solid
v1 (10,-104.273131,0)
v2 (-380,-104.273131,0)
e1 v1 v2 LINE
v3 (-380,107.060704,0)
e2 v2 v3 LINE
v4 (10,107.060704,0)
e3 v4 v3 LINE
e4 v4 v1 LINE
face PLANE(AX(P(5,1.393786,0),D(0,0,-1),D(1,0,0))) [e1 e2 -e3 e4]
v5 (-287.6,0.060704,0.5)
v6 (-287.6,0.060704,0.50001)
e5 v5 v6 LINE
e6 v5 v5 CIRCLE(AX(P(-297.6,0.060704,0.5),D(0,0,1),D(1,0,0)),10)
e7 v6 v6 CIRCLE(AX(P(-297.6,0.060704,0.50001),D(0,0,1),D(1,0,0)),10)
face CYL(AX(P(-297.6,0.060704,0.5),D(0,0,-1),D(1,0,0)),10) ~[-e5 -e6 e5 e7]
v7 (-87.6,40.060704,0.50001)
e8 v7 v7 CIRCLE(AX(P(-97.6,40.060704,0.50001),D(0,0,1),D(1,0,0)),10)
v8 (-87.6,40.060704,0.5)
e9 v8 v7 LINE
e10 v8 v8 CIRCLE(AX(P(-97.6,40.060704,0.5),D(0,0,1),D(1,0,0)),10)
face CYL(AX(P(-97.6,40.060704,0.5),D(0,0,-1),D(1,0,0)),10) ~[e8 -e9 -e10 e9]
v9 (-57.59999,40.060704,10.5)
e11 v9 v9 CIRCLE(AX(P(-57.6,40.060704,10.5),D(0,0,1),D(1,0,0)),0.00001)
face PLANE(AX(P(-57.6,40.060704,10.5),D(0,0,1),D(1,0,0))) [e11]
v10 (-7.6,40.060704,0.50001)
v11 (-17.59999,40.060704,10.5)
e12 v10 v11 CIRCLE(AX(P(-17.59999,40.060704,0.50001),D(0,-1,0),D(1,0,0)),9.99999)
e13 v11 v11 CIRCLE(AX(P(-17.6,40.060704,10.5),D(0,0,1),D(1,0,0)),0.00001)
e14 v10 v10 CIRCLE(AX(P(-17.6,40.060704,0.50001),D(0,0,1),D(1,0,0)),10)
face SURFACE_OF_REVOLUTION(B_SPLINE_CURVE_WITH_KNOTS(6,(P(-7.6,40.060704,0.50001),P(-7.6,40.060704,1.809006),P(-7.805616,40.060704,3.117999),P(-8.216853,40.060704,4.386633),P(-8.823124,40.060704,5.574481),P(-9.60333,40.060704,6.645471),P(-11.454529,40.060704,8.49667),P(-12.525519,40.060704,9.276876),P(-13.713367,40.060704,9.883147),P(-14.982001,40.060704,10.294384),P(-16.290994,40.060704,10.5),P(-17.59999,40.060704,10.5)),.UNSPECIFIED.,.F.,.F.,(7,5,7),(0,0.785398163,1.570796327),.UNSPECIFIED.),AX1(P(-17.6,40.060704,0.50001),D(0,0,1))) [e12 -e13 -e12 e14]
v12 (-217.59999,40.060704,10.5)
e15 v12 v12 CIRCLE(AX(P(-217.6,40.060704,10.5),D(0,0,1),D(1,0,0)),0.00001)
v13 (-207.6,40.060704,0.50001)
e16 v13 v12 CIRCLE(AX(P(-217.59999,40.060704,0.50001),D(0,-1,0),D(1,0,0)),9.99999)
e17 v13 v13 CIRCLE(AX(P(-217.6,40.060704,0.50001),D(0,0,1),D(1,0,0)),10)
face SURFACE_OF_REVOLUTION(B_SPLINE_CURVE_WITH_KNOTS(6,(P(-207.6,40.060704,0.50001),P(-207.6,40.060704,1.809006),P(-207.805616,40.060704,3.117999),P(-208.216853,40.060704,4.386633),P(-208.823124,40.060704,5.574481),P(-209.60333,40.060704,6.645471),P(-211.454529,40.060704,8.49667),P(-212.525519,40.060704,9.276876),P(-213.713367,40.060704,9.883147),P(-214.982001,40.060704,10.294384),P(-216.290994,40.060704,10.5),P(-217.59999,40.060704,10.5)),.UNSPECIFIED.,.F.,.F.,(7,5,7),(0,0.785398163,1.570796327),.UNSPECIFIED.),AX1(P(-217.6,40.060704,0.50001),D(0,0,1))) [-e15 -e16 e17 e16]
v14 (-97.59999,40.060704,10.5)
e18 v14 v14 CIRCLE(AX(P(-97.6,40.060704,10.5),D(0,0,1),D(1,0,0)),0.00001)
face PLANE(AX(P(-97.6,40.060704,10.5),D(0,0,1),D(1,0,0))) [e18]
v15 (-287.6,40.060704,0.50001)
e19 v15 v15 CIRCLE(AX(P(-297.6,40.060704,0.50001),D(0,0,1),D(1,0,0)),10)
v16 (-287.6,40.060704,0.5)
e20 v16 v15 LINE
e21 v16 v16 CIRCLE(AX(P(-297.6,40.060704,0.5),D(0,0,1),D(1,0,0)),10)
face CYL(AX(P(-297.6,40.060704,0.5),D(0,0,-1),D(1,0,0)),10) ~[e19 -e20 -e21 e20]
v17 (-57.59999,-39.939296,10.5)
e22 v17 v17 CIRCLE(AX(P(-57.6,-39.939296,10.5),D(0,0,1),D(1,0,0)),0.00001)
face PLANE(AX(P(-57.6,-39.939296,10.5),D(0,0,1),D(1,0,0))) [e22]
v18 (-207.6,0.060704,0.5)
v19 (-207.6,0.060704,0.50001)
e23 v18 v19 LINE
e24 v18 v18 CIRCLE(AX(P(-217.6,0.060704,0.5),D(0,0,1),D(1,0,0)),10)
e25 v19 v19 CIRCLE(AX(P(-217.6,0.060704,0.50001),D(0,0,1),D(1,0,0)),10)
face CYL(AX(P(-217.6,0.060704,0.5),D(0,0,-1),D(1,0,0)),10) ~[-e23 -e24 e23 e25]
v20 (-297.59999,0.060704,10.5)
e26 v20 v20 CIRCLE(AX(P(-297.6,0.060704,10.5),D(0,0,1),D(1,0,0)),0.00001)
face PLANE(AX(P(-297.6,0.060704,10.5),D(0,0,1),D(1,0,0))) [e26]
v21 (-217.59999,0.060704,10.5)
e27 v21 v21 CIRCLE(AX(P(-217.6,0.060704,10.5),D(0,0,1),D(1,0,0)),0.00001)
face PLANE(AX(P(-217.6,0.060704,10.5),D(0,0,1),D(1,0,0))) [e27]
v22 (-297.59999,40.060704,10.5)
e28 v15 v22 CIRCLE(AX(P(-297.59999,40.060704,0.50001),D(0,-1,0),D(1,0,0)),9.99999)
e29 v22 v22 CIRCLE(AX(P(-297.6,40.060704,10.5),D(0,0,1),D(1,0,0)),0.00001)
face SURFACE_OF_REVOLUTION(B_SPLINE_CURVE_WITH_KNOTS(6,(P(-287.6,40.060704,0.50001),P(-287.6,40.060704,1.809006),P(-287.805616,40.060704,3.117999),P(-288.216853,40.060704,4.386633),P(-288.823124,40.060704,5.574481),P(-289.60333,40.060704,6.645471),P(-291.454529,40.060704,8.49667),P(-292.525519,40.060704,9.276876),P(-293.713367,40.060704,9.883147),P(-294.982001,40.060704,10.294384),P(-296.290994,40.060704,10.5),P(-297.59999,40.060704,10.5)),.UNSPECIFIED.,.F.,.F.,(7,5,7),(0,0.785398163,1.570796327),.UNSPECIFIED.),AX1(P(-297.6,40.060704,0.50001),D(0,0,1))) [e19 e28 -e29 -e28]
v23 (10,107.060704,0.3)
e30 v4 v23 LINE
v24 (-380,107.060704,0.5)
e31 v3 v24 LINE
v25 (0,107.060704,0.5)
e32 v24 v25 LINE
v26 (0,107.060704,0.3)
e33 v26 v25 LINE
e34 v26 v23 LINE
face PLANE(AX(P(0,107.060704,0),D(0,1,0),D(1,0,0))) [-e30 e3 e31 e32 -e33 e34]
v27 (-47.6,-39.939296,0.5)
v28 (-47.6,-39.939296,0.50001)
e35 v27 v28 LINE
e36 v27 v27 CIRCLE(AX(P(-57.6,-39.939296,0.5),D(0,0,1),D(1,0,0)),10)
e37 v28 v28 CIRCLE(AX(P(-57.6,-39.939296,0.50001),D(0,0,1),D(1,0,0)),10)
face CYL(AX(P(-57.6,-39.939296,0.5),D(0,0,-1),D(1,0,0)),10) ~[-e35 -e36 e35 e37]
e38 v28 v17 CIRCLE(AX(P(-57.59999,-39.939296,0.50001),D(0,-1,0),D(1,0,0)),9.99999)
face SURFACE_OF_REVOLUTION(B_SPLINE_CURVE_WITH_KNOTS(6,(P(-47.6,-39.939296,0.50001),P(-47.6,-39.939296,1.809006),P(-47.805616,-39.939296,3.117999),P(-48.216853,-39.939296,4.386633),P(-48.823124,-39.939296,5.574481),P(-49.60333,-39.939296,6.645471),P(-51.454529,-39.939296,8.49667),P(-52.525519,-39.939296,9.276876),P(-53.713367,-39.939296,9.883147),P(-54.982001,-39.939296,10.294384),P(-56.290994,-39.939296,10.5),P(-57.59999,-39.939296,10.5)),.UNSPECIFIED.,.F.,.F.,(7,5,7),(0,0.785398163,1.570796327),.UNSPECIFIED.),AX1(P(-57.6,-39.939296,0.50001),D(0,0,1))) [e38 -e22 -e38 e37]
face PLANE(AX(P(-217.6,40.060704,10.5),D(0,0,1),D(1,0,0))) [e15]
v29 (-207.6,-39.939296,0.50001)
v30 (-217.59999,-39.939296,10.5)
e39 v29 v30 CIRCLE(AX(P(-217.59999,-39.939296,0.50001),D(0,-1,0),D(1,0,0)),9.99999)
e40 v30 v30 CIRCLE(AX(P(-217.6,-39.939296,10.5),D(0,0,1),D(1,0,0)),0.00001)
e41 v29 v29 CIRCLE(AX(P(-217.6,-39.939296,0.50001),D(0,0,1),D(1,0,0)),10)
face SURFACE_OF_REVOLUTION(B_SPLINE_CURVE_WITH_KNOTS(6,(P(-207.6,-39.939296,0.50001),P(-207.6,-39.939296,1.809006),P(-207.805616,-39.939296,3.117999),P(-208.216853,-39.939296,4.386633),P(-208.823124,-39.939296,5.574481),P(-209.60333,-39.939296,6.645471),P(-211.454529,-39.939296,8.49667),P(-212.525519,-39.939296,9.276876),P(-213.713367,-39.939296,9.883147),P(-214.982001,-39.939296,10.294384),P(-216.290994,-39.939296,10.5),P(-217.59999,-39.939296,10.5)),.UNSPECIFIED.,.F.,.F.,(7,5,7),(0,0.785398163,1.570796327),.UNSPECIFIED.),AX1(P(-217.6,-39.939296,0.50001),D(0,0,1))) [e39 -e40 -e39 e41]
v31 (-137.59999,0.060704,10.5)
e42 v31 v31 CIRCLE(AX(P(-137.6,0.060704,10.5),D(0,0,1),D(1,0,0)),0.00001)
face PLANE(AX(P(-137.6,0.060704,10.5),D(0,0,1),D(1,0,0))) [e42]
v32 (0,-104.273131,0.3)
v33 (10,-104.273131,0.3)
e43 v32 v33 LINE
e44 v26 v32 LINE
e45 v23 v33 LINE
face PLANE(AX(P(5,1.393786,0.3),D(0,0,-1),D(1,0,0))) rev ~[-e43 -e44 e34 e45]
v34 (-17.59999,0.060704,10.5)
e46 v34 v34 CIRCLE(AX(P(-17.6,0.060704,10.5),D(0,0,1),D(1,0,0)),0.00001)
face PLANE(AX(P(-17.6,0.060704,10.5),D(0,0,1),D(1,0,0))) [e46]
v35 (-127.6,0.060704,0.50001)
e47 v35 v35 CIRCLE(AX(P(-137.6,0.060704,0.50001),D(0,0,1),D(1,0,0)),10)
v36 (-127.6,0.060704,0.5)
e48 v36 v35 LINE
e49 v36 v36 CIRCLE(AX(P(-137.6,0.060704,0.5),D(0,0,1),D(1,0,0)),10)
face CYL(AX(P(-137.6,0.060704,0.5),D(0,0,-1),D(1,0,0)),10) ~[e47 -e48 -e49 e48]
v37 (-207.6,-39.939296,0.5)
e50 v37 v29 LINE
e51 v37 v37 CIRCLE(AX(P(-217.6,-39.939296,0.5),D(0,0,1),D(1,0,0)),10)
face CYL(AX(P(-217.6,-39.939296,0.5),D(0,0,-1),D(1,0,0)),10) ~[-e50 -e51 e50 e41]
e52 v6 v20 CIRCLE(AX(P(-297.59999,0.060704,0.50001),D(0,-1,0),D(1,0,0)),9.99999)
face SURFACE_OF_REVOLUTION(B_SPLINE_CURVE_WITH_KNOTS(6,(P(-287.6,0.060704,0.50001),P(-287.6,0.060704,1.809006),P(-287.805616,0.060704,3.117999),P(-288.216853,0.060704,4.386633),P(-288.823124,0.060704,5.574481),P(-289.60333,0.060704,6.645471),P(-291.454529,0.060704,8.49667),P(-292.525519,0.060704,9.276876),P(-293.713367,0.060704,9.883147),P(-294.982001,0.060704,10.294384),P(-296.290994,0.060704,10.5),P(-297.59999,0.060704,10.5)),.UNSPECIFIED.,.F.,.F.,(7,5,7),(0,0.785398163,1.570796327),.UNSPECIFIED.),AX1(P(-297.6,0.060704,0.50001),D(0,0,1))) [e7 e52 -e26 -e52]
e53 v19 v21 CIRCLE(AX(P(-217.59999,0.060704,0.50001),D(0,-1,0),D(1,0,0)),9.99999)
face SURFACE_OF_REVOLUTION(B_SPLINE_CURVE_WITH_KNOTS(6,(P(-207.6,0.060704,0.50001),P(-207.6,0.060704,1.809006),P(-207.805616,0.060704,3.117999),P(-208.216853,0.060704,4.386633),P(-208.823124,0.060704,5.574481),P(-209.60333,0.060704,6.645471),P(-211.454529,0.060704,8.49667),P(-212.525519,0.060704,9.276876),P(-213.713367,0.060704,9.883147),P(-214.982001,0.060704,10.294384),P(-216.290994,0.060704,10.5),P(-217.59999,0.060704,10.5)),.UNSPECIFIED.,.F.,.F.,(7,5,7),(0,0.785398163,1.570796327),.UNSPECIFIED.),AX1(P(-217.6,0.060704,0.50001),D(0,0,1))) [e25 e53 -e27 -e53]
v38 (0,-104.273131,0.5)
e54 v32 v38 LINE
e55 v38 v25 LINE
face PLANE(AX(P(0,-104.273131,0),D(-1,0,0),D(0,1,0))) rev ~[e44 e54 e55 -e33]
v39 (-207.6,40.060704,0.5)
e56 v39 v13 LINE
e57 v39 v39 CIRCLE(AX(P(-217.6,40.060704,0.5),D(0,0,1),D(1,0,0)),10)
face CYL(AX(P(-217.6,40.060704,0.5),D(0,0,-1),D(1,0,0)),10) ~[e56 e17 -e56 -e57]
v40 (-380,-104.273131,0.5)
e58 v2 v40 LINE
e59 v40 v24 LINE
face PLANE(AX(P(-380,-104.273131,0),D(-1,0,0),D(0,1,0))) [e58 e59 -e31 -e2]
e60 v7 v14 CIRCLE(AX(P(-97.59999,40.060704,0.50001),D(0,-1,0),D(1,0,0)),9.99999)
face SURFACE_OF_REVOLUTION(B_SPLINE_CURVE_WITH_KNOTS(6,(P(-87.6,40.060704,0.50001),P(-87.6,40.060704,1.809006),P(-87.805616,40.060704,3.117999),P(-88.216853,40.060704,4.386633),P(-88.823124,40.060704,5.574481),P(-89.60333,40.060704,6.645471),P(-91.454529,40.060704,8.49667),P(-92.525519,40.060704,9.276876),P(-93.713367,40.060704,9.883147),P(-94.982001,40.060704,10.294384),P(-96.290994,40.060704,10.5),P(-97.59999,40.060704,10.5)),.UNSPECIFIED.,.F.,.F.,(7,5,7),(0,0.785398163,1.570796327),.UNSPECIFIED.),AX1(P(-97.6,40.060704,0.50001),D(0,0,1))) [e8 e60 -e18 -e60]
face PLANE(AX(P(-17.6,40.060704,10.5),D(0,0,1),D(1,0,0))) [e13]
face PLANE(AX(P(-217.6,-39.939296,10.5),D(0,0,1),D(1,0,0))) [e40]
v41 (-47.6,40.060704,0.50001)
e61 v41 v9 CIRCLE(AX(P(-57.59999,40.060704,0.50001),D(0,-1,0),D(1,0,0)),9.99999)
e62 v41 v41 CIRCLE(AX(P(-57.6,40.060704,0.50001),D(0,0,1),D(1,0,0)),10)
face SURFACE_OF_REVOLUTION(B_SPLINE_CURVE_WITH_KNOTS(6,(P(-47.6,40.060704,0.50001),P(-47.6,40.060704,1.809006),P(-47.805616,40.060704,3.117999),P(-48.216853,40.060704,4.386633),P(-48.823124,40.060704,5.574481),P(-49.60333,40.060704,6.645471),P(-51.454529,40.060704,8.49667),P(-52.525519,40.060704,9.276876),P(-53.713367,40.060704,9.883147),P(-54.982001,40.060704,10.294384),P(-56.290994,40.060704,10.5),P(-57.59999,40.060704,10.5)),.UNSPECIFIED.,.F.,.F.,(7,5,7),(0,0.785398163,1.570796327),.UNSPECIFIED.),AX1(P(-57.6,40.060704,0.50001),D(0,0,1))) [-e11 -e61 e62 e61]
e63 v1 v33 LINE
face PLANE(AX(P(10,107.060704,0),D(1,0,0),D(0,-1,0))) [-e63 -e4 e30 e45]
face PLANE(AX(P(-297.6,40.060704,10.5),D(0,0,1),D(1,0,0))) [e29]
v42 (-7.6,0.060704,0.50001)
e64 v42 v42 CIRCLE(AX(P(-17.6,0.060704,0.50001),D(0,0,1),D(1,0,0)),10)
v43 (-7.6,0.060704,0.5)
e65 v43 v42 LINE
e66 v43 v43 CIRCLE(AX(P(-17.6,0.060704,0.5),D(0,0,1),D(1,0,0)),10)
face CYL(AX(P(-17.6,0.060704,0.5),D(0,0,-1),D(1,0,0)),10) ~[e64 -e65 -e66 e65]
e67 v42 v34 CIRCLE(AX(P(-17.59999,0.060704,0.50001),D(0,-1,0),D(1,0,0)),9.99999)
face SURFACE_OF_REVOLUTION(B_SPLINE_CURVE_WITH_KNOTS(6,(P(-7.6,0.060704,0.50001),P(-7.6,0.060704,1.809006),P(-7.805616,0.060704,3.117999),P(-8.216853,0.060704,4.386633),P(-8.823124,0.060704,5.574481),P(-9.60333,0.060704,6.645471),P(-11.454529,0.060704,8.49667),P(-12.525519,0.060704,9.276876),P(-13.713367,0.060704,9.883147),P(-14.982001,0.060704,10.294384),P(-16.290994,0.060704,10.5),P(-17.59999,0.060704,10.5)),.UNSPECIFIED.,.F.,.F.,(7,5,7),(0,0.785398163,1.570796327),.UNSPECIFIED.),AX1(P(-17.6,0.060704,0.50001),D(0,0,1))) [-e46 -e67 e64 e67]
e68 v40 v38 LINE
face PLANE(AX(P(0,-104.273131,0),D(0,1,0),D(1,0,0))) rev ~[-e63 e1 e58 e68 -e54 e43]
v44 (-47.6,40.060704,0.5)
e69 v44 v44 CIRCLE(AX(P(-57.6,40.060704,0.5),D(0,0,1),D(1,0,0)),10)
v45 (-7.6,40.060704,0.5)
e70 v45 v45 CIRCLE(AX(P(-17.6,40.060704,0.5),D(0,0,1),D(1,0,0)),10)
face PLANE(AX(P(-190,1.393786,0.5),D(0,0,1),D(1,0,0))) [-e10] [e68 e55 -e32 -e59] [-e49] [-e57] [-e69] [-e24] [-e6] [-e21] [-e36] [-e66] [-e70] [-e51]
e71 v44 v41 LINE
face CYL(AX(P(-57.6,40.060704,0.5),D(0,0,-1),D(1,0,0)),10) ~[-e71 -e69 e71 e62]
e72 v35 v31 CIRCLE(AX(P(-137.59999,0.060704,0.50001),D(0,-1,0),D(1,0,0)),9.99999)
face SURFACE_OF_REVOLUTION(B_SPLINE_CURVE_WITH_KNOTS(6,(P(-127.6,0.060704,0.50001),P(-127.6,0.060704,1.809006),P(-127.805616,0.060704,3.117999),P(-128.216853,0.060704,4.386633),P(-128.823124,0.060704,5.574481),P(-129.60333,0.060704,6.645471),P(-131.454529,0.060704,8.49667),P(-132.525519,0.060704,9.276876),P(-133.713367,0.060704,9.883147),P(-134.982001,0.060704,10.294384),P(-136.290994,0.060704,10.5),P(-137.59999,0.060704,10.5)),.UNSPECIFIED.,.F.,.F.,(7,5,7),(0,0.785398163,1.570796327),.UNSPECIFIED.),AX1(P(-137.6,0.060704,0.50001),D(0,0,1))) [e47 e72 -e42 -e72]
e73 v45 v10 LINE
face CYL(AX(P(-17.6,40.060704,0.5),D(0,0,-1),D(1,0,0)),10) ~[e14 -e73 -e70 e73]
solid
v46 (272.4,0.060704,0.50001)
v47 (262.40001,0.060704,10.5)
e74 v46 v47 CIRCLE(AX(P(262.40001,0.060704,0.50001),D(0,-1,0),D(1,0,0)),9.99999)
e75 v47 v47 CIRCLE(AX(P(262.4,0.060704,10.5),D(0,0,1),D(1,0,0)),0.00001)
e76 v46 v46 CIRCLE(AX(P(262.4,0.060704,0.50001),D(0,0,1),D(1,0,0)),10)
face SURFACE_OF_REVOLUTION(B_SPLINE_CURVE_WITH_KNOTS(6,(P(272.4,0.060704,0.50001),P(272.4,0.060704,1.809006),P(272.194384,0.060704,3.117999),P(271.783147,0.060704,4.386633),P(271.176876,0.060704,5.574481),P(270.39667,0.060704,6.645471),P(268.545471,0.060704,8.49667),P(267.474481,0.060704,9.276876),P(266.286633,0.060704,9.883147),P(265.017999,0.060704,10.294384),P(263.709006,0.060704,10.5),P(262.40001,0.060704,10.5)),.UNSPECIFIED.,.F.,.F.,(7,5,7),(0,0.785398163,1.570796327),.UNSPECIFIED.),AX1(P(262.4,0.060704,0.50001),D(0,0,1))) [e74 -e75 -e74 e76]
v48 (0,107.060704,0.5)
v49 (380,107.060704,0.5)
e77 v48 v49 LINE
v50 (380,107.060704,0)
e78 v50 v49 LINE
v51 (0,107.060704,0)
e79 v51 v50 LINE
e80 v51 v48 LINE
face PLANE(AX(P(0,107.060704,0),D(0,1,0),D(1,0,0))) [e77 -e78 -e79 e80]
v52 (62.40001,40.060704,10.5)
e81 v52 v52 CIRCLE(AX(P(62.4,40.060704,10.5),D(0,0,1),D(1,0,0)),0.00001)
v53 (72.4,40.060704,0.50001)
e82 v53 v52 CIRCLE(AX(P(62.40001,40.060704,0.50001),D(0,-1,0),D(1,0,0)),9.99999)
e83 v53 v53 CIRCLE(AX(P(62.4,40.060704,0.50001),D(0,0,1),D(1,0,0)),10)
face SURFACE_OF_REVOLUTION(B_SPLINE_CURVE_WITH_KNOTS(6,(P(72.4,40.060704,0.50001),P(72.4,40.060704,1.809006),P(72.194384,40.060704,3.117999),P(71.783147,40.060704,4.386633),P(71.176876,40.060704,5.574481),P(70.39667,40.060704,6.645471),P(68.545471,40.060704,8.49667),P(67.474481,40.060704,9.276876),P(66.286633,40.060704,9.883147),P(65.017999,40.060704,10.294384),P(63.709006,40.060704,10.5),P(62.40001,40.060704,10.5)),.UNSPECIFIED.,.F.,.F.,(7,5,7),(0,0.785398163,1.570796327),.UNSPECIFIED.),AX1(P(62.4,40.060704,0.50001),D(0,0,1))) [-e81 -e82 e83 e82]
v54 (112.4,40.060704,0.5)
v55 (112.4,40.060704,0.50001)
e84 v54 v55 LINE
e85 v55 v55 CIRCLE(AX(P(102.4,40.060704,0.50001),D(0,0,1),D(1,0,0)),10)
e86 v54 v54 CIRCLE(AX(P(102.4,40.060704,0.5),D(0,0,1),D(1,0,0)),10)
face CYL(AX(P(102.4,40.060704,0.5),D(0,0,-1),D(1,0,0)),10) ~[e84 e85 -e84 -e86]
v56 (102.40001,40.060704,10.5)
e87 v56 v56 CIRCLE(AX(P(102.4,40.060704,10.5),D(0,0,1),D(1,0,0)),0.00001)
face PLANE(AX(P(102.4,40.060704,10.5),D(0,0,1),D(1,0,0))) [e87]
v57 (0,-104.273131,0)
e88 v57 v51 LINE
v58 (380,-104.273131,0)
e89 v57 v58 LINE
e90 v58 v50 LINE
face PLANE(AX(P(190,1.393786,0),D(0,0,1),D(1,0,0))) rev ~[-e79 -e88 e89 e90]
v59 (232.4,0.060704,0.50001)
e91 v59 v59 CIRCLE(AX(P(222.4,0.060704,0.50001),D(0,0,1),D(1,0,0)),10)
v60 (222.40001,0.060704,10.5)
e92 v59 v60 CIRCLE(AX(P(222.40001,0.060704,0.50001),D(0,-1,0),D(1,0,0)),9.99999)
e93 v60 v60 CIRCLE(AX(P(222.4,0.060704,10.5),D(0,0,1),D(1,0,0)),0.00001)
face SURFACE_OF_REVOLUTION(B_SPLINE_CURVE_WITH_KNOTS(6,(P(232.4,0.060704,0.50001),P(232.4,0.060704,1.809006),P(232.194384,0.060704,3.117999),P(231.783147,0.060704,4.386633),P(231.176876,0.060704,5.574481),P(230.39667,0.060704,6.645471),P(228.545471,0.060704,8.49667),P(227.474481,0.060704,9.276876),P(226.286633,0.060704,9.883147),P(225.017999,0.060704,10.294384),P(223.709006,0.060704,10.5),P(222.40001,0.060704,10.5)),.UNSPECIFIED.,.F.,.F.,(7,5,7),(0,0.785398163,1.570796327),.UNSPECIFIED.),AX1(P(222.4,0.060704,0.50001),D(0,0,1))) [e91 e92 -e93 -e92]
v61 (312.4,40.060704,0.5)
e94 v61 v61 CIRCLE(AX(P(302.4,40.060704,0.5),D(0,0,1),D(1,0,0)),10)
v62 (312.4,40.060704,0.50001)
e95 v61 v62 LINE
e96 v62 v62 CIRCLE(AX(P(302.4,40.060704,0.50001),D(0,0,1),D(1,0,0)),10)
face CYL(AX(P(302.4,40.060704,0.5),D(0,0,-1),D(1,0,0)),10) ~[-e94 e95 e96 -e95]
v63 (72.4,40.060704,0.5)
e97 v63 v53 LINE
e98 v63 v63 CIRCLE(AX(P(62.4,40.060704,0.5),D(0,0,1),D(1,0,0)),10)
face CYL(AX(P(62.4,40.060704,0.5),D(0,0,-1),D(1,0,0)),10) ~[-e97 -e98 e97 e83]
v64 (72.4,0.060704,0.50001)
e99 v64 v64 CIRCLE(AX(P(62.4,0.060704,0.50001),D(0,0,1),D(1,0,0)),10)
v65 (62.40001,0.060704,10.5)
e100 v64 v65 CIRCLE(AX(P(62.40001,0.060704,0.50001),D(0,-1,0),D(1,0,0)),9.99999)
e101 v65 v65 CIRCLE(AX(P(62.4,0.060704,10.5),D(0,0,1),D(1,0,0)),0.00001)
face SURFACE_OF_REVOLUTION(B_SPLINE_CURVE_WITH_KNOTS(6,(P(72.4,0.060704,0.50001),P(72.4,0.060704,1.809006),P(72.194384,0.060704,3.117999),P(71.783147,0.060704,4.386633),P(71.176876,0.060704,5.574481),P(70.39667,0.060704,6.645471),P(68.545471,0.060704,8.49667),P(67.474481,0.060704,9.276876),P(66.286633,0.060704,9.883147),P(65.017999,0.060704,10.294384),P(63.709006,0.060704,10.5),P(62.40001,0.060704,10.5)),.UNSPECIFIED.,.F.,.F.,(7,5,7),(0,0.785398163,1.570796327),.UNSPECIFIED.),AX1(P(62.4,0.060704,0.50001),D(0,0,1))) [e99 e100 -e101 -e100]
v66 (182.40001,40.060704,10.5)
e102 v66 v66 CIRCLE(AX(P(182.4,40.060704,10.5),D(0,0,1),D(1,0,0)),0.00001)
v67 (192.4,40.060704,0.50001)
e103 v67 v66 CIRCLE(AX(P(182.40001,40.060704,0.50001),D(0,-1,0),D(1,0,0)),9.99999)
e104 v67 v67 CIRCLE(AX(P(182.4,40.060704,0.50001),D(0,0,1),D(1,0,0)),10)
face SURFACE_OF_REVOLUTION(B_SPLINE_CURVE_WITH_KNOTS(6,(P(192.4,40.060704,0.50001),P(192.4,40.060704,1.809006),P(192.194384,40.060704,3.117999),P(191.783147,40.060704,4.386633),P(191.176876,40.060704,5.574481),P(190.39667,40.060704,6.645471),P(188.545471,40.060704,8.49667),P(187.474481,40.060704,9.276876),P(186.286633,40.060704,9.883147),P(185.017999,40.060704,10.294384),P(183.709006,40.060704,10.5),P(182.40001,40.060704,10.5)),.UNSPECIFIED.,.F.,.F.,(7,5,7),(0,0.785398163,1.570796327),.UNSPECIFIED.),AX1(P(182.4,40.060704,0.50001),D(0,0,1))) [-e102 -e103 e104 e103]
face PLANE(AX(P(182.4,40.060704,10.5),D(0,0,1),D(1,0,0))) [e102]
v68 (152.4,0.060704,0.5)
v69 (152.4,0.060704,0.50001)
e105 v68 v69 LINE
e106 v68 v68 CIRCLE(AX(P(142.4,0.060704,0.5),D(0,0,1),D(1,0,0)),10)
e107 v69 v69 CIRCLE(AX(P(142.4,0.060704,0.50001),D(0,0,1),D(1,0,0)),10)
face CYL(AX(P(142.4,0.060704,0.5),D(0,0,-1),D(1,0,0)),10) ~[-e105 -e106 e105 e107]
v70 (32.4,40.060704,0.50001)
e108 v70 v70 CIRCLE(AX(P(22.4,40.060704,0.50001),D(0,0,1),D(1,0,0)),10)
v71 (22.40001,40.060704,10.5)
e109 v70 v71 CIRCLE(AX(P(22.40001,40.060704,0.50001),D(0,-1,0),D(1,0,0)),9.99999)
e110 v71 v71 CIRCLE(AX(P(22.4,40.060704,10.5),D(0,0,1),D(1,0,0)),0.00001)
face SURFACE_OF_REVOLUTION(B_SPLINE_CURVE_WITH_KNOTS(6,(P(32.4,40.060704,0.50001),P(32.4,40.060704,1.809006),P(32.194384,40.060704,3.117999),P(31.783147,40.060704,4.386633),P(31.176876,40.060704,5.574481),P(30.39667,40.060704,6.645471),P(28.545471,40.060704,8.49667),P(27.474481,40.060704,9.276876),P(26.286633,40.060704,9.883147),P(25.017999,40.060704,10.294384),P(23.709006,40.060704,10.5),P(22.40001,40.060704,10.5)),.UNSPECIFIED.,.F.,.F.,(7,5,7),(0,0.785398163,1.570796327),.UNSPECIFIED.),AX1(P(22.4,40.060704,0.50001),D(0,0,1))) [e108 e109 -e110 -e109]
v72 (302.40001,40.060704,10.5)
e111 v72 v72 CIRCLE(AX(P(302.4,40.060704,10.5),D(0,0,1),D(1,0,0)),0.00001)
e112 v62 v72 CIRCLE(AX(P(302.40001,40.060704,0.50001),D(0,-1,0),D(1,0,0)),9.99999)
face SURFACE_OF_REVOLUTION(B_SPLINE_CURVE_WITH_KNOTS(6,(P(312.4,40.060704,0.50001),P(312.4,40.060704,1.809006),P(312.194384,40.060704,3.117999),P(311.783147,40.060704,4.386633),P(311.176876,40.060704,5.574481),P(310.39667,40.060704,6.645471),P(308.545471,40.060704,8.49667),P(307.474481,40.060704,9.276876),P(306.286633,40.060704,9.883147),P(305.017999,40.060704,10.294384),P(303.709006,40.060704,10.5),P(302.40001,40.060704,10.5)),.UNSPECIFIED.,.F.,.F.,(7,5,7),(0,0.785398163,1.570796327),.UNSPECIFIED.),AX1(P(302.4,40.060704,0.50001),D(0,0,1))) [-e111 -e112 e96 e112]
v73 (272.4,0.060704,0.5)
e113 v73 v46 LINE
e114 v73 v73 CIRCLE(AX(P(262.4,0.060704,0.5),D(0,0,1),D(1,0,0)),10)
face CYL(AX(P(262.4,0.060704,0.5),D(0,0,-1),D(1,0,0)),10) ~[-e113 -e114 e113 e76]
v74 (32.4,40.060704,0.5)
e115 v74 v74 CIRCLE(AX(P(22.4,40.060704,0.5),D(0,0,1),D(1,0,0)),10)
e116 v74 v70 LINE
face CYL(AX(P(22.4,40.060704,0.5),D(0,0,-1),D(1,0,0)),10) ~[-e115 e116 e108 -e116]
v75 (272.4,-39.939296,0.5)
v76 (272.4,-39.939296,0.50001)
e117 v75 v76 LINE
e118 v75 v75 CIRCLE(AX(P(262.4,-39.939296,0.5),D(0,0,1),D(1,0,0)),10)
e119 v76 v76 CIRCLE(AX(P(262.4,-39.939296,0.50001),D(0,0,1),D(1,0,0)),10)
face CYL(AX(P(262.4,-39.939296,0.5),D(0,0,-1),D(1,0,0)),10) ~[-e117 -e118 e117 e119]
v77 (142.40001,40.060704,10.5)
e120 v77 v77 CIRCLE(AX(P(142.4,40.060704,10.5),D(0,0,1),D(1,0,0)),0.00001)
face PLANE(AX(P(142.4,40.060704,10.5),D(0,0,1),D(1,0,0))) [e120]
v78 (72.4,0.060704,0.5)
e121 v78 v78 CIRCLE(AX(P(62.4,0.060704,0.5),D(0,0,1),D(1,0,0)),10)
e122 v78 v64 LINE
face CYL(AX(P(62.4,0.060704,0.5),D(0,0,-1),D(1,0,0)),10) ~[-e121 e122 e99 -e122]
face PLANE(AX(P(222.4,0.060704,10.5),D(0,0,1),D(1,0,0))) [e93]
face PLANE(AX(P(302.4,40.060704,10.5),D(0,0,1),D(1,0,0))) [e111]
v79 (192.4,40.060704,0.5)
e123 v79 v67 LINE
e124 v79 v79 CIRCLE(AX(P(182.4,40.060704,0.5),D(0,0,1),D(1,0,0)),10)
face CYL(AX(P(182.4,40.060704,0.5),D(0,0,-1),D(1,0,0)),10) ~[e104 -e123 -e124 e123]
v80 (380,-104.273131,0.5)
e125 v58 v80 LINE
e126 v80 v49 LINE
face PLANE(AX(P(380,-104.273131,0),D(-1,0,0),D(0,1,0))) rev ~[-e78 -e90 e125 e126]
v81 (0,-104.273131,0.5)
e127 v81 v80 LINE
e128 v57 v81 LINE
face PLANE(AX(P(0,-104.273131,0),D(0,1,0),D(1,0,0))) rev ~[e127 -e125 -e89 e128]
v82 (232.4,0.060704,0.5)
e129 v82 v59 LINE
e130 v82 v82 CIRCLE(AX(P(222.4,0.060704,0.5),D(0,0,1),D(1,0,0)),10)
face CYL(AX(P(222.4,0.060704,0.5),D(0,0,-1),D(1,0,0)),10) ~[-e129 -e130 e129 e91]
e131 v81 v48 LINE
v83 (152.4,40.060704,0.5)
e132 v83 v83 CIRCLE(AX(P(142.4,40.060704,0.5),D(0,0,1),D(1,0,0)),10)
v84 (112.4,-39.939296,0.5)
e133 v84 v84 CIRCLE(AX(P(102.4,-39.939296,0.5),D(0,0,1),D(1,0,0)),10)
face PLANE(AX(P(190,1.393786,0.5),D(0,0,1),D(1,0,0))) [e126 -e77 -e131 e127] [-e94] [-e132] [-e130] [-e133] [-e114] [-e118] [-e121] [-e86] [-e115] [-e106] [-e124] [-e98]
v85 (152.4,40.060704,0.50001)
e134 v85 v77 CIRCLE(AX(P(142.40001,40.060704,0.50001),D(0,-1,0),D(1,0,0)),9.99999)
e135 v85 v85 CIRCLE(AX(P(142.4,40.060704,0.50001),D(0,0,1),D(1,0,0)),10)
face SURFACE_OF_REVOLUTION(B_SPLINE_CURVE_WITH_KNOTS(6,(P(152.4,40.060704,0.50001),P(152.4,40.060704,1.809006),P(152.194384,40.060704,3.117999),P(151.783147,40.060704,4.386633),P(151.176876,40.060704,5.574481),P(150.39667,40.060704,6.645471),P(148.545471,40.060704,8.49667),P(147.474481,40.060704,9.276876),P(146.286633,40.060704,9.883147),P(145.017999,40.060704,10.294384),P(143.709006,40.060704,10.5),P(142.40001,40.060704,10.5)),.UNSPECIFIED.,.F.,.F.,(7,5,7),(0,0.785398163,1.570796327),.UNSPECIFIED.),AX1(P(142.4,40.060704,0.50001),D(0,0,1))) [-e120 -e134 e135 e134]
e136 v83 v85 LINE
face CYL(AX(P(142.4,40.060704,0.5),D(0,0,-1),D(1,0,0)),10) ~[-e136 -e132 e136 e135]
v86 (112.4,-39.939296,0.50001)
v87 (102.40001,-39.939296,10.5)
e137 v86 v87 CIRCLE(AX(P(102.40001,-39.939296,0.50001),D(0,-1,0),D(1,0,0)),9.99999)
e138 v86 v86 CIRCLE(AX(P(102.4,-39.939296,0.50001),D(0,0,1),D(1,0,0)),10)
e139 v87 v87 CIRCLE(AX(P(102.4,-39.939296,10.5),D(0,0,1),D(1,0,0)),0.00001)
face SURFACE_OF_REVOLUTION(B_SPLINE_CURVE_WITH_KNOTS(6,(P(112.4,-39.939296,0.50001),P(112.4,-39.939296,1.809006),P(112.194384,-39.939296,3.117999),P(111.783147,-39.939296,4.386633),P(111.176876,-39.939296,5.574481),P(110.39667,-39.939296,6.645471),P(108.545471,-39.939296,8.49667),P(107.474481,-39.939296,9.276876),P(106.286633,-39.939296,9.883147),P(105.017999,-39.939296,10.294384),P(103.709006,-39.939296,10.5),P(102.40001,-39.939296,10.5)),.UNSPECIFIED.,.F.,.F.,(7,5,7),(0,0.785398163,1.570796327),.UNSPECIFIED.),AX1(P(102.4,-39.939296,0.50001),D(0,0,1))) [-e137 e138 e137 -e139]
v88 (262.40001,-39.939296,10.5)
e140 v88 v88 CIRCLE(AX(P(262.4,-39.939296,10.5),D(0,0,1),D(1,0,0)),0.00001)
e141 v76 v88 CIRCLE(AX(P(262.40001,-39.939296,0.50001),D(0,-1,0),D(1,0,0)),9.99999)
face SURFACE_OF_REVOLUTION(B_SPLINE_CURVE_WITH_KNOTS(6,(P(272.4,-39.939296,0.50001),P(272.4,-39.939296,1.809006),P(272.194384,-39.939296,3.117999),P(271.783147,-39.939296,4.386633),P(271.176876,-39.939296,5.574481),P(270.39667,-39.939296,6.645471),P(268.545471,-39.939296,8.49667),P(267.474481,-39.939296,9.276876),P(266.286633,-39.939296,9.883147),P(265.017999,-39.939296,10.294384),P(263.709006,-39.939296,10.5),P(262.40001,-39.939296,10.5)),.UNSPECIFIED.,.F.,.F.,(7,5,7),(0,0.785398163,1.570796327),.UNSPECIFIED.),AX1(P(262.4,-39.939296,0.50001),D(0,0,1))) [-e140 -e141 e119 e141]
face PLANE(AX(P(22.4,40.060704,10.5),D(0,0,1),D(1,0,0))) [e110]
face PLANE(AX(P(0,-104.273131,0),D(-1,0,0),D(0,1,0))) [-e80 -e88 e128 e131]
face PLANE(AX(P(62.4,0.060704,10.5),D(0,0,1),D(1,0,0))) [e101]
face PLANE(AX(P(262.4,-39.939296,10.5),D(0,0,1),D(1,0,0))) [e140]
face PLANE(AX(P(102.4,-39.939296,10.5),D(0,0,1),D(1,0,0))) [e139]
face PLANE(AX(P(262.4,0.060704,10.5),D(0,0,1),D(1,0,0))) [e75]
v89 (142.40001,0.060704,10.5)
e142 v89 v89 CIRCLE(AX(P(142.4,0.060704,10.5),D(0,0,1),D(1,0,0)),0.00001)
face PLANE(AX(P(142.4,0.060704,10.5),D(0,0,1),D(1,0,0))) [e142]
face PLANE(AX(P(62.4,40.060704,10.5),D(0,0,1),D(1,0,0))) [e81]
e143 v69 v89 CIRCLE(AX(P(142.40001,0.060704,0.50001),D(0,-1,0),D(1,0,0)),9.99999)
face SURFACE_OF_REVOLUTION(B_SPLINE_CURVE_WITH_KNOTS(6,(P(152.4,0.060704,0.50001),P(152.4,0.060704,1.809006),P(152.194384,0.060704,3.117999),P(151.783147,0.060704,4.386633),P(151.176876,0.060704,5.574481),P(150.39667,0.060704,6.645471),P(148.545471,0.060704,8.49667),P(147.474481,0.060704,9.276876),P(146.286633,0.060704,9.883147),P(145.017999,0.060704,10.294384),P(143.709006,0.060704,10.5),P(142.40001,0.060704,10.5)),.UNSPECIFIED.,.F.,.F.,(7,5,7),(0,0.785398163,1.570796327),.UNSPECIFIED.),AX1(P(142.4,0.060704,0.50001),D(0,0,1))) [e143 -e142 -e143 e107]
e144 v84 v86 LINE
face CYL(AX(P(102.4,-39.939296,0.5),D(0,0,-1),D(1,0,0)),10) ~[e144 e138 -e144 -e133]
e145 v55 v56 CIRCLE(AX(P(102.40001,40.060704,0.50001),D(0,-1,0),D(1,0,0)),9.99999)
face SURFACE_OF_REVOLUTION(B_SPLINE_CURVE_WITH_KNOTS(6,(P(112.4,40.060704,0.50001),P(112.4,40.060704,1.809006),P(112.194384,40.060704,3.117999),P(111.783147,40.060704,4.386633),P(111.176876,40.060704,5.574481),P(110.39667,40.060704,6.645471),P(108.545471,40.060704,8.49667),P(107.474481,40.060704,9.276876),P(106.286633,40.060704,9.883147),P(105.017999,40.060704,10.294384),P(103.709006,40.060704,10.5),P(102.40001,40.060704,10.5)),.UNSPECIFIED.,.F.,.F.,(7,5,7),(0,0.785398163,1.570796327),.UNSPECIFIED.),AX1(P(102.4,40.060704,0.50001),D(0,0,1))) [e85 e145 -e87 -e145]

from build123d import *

# Parameters (mm, degrees)
F1_W      = 380
F1_H      = 211.3338357197
F2_DEPTH  = 0.5
F3_R      = 10
F4_DEPTH  = 10
F5_R      = 9.99999
F6_W      = 10
F6_H      = 211.3338357197
F7_DEPTH  = 0.3
F8_W      = 380
F8_H      = 211.3338357197
F9_DEPTH  = 0.5
F10_R     = 10
F11_DEPTH = 10
F12_R     = 9.99999


# Not quite as in the source:
# - a fillet or chamfer is up to 0.001 mm smaller than in the source, because OpenCascade refuses the exact size


with BuildPart() as f2:
    # F1 (on Top) → F2 (new body)
    with BuildSketch(Plane.XY):
        with Locations((-190, 1.3937864294)):
            Rectangle(F1_W, F1_H)
    extrude(amount=F2_DEPTH)

    # F3 (on face) → F4 (join)
    with BuildSketch(Plane.XY.offset(0.5)):
        with Locations((-297.6, 40.0607042892)):
            Circle(F3_R)
        with Locations((-297.6, 0.0607042892)):
            Circle(F3_R)
        with Locations((-217.6, 40.0607042892)):
            Circle(F3_R)
        with Locations((-217.6, 0.0607042892)):
            Circle(F3_R)
        with Locations((-217.6, -39.9392957108)):
            Circle(F3_R)
        with Locations((-137.6, 0.0607042892)):
            Circle(F3_R)
        with Locations((-97.6, 40.0607042892)):
            Circle(F3_R)
        with Locations((-57.6, 40.0607042892)):
            Circle(F3_R)
        with Locations((-57.6, -39.9392957108)):
            Circle(F3_R)
        with Locations((-17.6, 40.0607042892)):
            Circle(F3_R)
        with Locations((-17.6, 0.0607042892)):
            Circle(F3_R)
    extrude(amount=F4_DEPTH)

    # F5 (radius 10 in the source; OpenCascade refuses exactly that, so slightly less here)
    f5_edges = [f2.edges().sort_by_distance(p)[0] for p in [
        (-307.6, 40.060704, 10.5),
        (-307.6, 0.060704, 10.5),
        (-227.6, 40.060704, 10.5),
        (-227.6, 0.060704, 10.5),
        (-227.6, -39.939296, 10.5),
        (-147.6, 0.060704, 10.5),
        (-107.6, 40.060704, 10.5),
        (-67.6, 40.060704, 10.5),
        (-27.6, 40.060704, 10.5),
        (-27.6, 0.060704, 10.5),
        (-67.6, -39.939296, 10.5),
    ]]
    fillet(f5_edges, radius=F5_R)

    # F6 (on face) → F7 (join)
    with BuildSketch(Plane(origin=(0, 0, 0), x_dir=(1, 0, 0), z_dir=(0, 0, -1))):
        with Locations((5, -1.3937864294)):
            Rectangle(F6_W, F6_H)
    extrude(amount=-F7_DEPTH)


with BuildPart() as f9:
    # F8 (on Top) → F9 (new body)
    with BuildSketch(Plane.XY):
        with Locations((190, 1.3937864294)):
            Rectangle(F8_W, F8_H)
    extrude(amount=F9_DEPTH)

    # F10 (on face) → F11 (join)
    with BuildSketch(Plane.XY.offset(0.5)):
        with Locations((22.4, 40.0607042892)):
            Circle(F10_R)
        with Locations((62.4, 40.0607042892)):
            Circle(F10_R)
        with Locations((62.4, 0.0607042892)):
            Circle(F10_R)
        with Locations((102.4, 40.0607042892)):
            Circle(F10_R)
        with Locations((102.4, -39.9392957108)):
            Circle(F10_R)
        with Locations((142.4, 40.0607042892)):
            Circle(F10_R)
        with Locations((142.4, 0.0607042892)):
            Circle(F10_R)
        with Locations((182.4, 40.0607042892)):
            Circle(F10_R)
        with Locations((222.4, 0.0607042892)):
            Circle(F10_R)
        with Locations((262.4, 0.0607042892)):
            Circle(F10_R)
        with Locations((262.4, -39.9392957108)):
            Circle(F10_R)
        with Locations((302.4, 40.0607042892)):
            Circle(F10_R)
    extrude(amount=F11_DEPTH)

    # F12 (radius 10 in the source; OpenCascade refuses exactly that, so slightly less here)
    f12_edges = [f9.edges().sort_by_distance(p)[0] for p in [
        (12.4, 40.060704, 10.5),
        (52.4, 40.060704, 10.5),
        (92.4, 40.060704, 10.5),
        (132.4, 40.060704, 10.5),
        (172.4, 40.060704, 10.5),
        (212.4, 0.060704, 10.5),
        (252.4, 0.060704, 10.5),
        (292.4, 40.060704, 10.5),
        (252.4, -39.939296, 10.5),
        (132.4, 0.060704, 10.5),
        (92.4, -39.939296, 10.5),
        (52.4, 0.060704, 10.5),
    ]]
    fillet(f12_edges, radius=F12_R)


solid = Compound([f2.part, f9.part])
